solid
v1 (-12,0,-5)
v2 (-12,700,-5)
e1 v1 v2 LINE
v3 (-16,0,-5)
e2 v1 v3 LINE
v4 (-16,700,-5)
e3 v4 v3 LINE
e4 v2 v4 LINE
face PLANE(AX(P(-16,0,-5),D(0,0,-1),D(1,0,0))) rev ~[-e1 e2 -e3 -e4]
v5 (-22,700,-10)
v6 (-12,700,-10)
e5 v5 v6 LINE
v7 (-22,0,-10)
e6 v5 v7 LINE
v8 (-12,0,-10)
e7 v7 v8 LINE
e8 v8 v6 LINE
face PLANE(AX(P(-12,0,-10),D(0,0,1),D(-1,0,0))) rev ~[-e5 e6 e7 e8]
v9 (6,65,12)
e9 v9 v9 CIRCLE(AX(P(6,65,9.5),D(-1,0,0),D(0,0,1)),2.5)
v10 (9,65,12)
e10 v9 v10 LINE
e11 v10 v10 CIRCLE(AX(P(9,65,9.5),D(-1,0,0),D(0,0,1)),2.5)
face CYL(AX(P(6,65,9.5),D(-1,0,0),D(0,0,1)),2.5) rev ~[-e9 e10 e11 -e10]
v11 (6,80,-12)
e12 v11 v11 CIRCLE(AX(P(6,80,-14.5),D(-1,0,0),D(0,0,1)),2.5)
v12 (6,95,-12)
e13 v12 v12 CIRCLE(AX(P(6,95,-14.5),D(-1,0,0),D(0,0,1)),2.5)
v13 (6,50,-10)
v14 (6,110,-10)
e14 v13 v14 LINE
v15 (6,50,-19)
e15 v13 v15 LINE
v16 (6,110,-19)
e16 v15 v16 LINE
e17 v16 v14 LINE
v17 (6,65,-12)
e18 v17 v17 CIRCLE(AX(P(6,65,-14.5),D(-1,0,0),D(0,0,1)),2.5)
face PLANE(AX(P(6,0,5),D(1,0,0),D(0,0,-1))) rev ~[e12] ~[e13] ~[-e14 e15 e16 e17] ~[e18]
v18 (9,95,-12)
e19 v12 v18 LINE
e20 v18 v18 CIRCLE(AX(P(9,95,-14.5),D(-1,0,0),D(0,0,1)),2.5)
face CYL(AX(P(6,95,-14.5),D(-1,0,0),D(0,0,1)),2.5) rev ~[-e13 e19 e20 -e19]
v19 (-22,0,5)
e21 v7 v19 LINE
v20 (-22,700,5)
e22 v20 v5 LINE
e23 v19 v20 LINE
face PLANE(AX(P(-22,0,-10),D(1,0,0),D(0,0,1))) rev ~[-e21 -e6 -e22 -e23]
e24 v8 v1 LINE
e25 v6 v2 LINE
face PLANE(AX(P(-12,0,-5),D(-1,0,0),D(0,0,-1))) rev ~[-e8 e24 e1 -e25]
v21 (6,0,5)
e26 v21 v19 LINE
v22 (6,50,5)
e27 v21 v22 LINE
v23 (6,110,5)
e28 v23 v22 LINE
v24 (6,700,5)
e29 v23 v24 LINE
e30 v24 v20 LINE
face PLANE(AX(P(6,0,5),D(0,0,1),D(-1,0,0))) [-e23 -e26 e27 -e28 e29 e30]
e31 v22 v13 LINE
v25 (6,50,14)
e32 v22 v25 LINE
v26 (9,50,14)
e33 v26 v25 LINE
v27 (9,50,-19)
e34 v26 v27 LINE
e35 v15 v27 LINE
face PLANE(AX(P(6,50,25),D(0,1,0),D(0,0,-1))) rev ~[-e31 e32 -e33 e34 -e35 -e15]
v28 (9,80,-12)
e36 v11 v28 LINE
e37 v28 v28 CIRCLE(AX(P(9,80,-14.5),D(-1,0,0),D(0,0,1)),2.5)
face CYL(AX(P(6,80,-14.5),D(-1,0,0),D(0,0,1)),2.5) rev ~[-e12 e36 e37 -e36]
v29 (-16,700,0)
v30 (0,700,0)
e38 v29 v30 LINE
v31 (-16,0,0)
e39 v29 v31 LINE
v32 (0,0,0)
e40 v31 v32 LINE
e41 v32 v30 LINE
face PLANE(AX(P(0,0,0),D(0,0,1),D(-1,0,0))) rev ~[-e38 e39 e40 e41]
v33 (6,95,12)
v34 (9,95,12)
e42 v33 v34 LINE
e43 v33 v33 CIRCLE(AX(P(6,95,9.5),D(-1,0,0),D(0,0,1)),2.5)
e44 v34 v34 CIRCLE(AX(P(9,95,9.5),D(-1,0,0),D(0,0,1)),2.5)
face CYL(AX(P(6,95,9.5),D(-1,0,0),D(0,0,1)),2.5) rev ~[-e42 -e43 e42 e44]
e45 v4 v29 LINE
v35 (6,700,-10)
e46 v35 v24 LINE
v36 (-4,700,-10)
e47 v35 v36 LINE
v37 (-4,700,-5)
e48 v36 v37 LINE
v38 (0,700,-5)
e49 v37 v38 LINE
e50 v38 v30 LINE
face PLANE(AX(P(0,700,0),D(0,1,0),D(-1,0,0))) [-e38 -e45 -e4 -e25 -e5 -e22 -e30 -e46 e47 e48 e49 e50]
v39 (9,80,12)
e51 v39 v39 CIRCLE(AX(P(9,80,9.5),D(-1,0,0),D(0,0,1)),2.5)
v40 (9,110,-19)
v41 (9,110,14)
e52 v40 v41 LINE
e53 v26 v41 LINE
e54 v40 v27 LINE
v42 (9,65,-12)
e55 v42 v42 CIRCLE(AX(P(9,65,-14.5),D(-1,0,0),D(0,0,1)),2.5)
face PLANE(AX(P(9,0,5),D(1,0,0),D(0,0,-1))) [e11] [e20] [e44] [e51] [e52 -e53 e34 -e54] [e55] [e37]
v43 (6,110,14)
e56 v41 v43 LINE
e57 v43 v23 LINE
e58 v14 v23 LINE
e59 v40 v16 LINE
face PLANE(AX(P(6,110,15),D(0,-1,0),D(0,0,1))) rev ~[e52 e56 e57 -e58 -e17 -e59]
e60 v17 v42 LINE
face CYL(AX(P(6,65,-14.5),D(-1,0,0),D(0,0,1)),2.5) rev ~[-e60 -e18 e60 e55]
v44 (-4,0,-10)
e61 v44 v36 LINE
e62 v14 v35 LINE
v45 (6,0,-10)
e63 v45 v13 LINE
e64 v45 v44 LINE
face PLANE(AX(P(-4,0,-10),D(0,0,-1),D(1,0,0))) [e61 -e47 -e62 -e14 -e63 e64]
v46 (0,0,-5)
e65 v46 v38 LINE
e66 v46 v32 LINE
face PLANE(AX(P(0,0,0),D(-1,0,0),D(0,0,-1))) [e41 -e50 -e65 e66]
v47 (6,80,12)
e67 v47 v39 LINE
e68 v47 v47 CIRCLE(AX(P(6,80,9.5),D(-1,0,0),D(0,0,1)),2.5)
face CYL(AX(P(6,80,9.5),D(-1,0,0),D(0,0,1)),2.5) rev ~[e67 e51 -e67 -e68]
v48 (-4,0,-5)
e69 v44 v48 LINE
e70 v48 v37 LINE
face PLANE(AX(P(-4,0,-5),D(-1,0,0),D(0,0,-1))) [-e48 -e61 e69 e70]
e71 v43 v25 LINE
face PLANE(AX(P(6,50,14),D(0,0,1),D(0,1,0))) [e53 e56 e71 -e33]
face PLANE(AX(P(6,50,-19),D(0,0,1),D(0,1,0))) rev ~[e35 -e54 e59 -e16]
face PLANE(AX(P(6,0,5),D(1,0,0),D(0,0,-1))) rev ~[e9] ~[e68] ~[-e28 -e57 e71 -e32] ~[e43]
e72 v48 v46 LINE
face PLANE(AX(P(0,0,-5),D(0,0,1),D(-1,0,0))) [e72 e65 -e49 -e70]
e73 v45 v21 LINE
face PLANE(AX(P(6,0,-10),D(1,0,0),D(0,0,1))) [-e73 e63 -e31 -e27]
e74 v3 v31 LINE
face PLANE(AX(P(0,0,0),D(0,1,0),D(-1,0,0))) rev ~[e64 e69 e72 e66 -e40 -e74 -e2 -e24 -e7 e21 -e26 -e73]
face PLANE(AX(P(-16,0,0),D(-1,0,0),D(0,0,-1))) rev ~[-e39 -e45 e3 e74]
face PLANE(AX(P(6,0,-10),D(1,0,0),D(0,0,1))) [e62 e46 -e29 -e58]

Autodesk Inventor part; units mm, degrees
ref_plane "YZ Plane" through (0, 0, 0) normal (1, 0, 0) x (0, 1, 0)
ref_plane "XZ Plane" through (0, 0, 0) normal (0, 1, 0) x (-1, 0, 0)
ref_plane "XY Plane" through (0, 0, 0) normal (0, 0, 1) x (1, 0, 0)
sketch "Sketch1" plane through (0, 0, 0) normal (0, 1, 0) x (-1, 0, 0)
  line L0 (0, 0) -> (16, 0)
  line L1 (16, 0) -> (16, -5)
  line L2 (16, -5) -> (12, -5)
  line L3 (12, -5) -> (12, -10)
  line L4 (12, -10) -> (22, -10)
  line L5 (22, -10) -> (22, 5)
  line L6 (22, 5) -> (-4, 5)
  line L7 (0, 0) -> (0, -5)
  line L8 (0, -5) -> (4, -5)
  line L9 (4, -5) -> (4, -10)
  line L10 (4, -10) -> (-6, -10)
  line L11 (-6, -10) -> (-6, 5)
  line L12 (-6, 5) -> (-4, 5)
  dimension "d0" = 16
  dimension "d1" = 5
  dimension "d2" = 4
  dimension "d3" = 5
  dimension "d4" = 10
  dimension "d5" = 15
  dimension "d6" = 26
  dimension "d11" = 5
  dimension "d12" = 4
  dimension "d13" = 5
  dimension "d14" = 10
  dimension "d15" = 15
extrude "Extrusion1" add sketch "Sketch1" along normal blind 500
sketch "Sketch2" plane through (6, 0, 5) normal (1, 0, 0) x (0, 0, -1)
  line L0 (0, 0) -> (0, 500) projected
  line L1 (0, 0) -> (0, 80)
  line L2 (0, 80) -> (15, 80)
  line L3 (15, 0) -> (15, 500) projected
  line L4 (15, 80) -> (35, 80)
  line L5 (35, 80) -> (35, 110)
  line L6 (35, 110) -> (-20, 110)
  line L7 (-20, 110) -> (-20, 50)
  line L8 (-20, 50) -> (35, 50)
  line L9 (35, 50) -> (35, 80)
  line L10 (-20, 110) -> (-10, 110)
  line L11 (-10, 110) -> (-10, 90)
  line L12 (-10, 90) -> (-10, 70)
  line L13 (-10, 70) -> (25, 70)
  line L14 (25, 70) -> (25, 90)
  line L15 (-10, 95) -> (-15.9639, 95)
  line L16 (-10, 65) -> (-17.5959, 65)
  circle A0 centre (25, 95) radius 5
  circle A1 centre (-10, 95) radius 5
  circle A2 centre (25, 65) radius 5
  circle A3 centre (-10, 65) radius 5
  point P0 (5, 0)
  dimension "d18" = 80
  dimension "d19" = 15
  dimension "d20" = 20
  dimension "d21" = 30
  dimension "d22" = 55
  dimension "d23" = 60
  dimension "d24" = 10
  dimension "d25" = 20
  dimension "d26" = 20
  dimension "d27" = 35
  dimension "d28" = 20
  dimension "d33" = 10
  dimension "d34" = 10
  dimension "d35" = 10
  dimension "d36" = 10
extrude "Extrusion2" add sketch "Sketch2" along normal blind 3 contours L8 L7 L6 L11 A1 L12 L13 L0 | L0 L13 L3 L8 | L13 L12 A1 L11 L6 L0 | L0 L2 L3 L13 | L3 L13 L14 L4 L9 L8 | L0 L6 L3 L2 | L3 L4 L14 L13 | L3 L6 L5 L4
sketch "Sketch3" plane through (6, 0, 5) normal (-1, 0, 0) x (0, 0, 1)
  line L0 (20, 50) -> (-35, 50) projected
  line L1 (-35, 50) -> (-35, 110) projected
  line L2 (-35, 50) -> (-35, 110)
  line L3 (-35, 110) -> (20, 110) projected
  line L4 (-35, 110) -> (20, 110)
  line L5 (20, 110) -> (20, 50) projected
  line L6 (20, 110) -> (20, 50)
  line L7 (20, 50) -> (-35, 50)
  point P0 (-5, 0)
extrude "Extrusion3" add sketch "Sketch3" against normal blind 3
sketch "Sketch4" plane through (6, 0, 5) normal (-1, 0, 0) x (0, 0, 1)
  line L0 (0, 50) -> (0, 110) projected
  line L1 (0, 50) -> (9, 50)
  line L2 (20, 50) -> (-35, 50) projected
  line L3 (9, 50) -> (9, 110)
  line L4 (-35, 110) -> (20, 110) projected
  line L5 (9, 110) -> (23.2747, 110)
  line L6 (-35, 110) -> (-15, 110) projected
  line L7 (23.2747, 110) -> (23.2747, 50)
  line L8 (23.2747, 50) -> (9, 50)
  line L9 (-15, 50) -> (-35, 50) projected
  line L10 (-15, 50) -> (-24, 50)
  line L11 (-24, 50) -> (-24, 110)
  line L12 (-24, 110) -> (-51.0156, 108.7427)
  line L13 (-51.0156, 108.7427) -> (-51.1782, 112.2347)
  line L14 (-51.1782, 112.2347) -> (-24, 110)
  line L15 (-51.0156, 108.7427) -> (-55.6093, 34.9275)
  line L16 (-55.6093, 34.9275) -> (-24, 50)
  point P0 (-5, 0)
  dimension "d41" = 9
  dimension "d42" = 9
extrude "Extrusion4" cut sketch "Sketch4" against normal blind 3 contours L3 L4 L5 L7 L8 L2 | L16 L15 L12 L11 | L12 L13 L14
sketch "Sketch5" plane through (6, 0, 5) normal (-1, 0, 0) x (0, 0, 1)
  line L0 (-15, 50) -> (-24, 50) projected
  line L1 (-24, 50) -> (-19.5, 50)
  circle A0 centre (-19.5, 95) radius 2.5
  circle A1 centre (-19.5, 80) radius 2.5
  circle A2 centre (-19.5, 65) radius 2.5
  line L2 (9, 50) -> (0, 50) projected
  line L3 (9, 50) -> (4.5, 50)
  circle A3 centre (4.5, 95) radius 2.5
  circle A4 centre (4.5, 80) radius 2.5
  circle A5 centre (4.5, 65) radius 2.5
  point P0 (-5, 0)
  dimension "d48" = 5
  dimension "d49" = 5
  dimension "d50" = 5
  dimension "d51" = 4.5
  dimension "d52" = 5
  dimension "d53" = 5
  dimension "d54" = 5
extrude "Extrusion5" cut sketch "Sketch5" against normal blind 3
thicken "Thicken1" operation add thickness 200 both sides no extend neighbours yes toward (0, 1, 0) faces at (-5.3333, 500, 3.3333)
properties part number "Guia"
